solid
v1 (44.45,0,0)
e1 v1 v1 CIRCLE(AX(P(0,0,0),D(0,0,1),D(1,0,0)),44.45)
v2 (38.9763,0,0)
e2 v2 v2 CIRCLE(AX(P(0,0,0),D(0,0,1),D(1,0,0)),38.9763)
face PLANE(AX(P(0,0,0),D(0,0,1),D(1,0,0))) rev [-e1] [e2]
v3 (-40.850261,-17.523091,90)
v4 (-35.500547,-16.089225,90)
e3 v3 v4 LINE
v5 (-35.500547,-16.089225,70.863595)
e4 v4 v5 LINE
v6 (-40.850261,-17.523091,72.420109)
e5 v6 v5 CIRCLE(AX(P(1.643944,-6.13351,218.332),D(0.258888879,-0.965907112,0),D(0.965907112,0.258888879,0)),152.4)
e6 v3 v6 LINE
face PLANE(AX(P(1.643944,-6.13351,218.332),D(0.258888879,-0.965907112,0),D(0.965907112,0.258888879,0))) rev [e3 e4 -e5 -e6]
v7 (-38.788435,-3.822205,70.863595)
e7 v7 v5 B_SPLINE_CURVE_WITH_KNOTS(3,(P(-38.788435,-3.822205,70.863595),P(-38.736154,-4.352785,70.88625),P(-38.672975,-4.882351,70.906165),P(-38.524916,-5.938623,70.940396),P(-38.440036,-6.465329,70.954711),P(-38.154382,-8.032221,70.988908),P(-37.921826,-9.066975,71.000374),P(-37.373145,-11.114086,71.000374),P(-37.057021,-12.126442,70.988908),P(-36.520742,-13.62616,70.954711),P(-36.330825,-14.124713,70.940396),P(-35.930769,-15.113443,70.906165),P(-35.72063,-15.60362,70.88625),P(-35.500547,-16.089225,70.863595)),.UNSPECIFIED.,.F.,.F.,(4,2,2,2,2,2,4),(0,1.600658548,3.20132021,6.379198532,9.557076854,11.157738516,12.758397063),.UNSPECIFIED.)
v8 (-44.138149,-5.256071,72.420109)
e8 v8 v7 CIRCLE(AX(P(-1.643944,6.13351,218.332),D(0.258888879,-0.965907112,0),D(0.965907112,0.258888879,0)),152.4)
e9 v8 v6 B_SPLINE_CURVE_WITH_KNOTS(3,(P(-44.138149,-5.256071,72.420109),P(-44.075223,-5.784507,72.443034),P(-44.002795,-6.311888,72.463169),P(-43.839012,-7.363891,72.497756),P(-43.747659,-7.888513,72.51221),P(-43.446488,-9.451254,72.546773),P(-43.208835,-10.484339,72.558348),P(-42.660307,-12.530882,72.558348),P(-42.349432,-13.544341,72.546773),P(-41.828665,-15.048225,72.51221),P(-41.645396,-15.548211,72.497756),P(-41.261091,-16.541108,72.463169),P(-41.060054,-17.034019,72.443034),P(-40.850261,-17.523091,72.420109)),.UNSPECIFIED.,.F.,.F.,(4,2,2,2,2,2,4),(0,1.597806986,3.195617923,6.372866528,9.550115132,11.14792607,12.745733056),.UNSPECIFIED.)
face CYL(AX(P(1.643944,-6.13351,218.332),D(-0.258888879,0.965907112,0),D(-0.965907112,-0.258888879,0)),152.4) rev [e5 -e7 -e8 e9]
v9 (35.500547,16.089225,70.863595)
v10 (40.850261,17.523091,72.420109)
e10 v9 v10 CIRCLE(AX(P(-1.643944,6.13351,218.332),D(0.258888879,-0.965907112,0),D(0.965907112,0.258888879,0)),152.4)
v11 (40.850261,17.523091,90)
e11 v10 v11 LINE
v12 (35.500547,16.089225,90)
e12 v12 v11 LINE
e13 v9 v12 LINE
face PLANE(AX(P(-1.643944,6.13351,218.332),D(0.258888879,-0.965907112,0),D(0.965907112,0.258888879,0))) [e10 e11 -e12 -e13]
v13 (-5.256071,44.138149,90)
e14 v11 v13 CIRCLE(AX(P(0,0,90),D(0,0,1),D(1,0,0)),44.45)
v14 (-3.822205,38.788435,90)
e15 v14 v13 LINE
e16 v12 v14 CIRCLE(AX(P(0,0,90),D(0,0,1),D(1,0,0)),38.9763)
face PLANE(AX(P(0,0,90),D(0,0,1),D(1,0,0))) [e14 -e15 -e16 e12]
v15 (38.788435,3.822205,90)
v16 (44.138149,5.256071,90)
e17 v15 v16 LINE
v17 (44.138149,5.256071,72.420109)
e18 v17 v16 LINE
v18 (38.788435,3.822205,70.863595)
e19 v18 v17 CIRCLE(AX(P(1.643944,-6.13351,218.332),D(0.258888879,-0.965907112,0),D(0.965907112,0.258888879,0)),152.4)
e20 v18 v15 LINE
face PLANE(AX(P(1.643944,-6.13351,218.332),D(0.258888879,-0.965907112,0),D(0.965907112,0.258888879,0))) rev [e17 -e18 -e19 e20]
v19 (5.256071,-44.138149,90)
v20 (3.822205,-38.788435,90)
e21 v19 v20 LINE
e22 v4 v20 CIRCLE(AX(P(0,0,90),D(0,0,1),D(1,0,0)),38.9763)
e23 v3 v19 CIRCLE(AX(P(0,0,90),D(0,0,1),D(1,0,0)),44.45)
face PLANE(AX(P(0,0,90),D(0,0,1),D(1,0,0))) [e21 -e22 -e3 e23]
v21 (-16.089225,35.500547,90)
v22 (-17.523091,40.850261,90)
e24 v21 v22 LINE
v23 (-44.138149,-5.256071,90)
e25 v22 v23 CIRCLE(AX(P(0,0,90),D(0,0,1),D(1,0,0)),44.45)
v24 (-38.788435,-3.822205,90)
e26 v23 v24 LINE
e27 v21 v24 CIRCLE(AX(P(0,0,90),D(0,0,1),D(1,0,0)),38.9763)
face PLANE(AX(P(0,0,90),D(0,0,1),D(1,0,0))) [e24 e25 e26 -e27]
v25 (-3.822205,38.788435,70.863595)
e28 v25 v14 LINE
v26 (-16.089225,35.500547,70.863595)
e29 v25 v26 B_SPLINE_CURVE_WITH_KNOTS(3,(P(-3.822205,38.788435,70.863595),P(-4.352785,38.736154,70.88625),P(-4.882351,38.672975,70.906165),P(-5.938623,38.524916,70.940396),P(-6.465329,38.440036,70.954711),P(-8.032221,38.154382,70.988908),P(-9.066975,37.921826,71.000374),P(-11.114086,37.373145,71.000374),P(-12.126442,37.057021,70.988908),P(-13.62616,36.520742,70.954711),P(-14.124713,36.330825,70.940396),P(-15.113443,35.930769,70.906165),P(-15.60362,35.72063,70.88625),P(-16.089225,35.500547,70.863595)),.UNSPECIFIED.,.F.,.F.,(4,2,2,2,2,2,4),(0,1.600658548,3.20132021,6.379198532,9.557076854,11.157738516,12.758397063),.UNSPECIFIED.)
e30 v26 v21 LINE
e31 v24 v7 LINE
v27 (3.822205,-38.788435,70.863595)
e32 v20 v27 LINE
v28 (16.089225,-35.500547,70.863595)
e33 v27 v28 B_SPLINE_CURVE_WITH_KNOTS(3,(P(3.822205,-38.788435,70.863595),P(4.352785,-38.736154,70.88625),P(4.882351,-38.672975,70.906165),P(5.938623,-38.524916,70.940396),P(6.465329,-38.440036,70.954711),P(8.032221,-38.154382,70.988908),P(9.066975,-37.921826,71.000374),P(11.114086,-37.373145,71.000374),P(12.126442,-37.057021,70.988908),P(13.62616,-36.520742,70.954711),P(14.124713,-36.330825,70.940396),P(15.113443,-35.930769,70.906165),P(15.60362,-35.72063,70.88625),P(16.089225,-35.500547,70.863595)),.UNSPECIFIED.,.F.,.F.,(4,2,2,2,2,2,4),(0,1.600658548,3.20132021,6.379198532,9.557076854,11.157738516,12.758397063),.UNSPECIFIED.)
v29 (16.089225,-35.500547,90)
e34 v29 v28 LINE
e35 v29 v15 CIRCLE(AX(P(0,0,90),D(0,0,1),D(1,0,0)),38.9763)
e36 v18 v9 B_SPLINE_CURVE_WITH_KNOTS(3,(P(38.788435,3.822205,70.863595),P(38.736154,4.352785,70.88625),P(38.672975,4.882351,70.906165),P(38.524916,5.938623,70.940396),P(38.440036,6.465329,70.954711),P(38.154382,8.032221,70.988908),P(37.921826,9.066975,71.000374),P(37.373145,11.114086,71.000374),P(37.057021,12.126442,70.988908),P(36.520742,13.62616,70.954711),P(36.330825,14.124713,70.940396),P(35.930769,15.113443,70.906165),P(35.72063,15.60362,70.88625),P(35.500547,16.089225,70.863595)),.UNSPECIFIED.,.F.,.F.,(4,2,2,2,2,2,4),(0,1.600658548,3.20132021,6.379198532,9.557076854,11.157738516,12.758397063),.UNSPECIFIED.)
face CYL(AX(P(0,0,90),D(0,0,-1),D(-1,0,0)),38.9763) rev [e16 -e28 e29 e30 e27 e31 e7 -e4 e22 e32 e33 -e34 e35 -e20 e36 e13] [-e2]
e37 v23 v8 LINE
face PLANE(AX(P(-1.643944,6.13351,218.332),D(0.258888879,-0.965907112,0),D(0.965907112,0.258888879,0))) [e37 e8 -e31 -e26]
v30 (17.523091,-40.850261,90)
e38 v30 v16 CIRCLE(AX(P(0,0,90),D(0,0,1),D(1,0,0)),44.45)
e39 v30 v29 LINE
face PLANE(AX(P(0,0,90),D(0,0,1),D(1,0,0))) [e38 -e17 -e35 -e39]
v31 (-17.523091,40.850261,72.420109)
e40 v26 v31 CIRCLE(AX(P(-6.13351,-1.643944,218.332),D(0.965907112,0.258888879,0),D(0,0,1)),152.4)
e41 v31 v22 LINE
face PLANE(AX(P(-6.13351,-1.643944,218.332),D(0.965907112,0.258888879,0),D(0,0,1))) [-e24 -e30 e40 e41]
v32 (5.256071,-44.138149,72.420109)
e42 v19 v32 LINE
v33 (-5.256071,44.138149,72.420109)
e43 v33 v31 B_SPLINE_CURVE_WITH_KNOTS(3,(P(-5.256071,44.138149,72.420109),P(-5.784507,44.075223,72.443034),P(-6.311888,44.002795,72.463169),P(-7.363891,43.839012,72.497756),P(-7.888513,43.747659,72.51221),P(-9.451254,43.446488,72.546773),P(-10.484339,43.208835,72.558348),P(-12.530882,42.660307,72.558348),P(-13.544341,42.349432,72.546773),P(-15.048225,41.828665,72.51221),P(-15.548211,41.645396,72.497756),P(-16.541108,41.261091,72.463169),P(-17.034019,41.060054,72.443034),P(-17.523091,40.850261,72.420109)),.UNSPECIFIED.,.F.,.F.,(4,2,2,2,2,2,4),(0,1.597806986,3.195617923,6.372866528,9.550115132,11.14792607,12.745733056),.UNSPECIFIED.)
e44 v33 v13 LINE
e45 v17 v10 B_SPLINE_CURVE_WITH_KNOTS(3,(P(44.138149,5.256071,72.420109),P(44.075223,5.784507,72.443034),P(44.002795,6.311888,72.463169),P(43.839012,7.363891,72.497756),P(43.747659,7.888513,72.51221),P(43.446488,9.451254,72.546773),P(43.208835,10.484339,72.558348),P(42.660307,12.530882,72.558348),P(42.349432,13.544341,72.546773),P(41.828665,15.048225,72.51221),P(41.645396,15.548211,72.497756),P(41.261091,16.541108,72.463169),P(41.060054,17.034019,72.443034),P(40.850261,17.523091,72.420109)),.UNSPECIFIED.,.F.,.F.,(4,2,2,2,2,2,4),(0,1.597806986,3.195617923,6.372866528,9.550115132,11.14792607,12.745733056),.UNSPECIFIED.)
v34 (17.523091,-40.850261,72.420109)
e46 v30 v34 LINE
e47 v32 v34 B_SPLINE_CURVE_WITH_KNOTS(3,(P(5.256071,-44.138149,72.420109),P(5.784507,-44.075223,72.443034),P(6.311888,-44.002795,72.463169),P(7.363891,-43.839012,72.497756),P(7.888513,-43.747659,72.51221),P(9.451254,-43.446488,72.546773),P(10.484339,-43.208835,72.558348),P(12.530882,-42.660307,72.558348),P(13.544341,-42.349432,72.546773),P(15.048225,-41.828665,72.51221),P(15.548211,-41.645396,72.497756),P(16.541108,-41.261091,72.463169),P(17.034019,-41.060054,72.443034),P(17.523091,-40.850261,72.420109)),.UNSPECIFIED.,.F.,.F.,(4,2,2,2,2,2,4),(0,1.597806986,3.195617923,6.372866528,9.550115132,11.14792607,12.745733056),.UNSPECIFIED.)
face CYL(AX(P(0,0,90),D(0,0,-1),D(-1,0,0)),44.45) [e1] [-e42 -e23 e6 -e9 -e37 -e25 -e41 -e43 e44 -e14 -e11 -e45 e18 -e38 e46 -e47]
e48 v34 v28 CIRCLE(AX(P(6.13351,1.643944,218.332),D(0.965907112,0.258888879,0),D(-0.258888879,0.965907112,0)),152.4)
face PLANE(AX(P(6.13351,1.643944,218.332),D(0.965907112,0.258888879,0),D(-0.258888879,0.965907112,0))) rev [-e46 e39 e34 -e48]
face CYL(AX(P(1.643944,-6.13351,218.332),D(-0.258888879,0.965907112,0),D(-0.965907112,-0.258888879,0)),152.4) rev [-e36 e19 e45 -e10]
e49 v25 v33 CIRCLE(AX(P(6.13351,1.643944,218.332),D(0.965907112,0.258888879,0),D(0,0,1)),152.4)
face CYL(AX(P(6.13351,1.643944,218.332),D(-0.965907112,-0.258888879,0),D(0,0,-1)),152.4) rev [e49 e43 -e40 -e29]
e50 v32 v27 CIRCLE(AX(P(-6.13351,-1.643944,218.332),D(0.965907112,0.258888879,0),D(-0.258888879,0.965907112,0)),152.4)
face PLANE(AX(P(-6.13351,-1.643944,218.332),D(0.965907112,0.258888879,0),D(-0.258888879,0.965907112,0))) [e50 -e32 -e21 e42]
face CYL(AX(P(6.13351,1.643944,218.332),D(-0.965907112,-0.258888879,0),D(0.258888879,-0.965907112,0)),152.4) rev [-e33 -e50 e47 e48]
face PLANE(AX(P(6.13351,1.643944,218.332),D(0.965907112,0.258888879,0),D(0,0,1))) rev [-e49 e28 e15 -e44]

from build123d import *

# Parameters (mm, degrees)
SKETCH1_R           = 44.45
SKETCH1_R_2         = 38.9763
BOSS_EXTRUDE1_DEPTH = 90
CAVITY1_START       = -6.35
CAVITY1_DEPTH       = 12.7
CAVITY1_2_DEPTH     = 12.7


# Read off the part's stored shape, not the designer's step: Cavity1
with BuildPart() as part:
    # Sketch1 → Boss-Extrude1 (new body)
    with BuildSketch(Plane.XY):
        with Locations(Location((0, 0, 0), (0, 0, 180))):
            Circle(SKETCH1_R)
        with Locations(Location((0, 0, 0), (0, 0, 180))):
            Circle(SKETCH1_R_2, mode=Mode.SUBTRACT)
    extrude(amount=BOSS_EXTRUDE1_DEPTH)

    # Cavity1 outline → Cavity1 (cut)
    with BuildSketch(Plane(origin=(0, 0, 0), x_dir=(-0.258888878578149, 0.9659071117600018, 0), z_dir=(0.9659071117600018, 0.25888887857814896, 0)).offset(CAVITY1_START)):
        with BuildLine():
            ThreePointArc((38.455551767, 70.863594779), (41.461594511, 71.680385005), (44.450315107, 72.558444487))
            Line((44.450315107, 72.558444487), (46, 73.030985488))
            Line((46, 73.030985488), (46, 90))
            Line((46, 90), (-46, 90))
            Line((-46, 90), (-46, 73.030985488))
            Line((-46, 73.030985488), (-44.450315107, 72.558444487))
            ThreePointArc((-44.450315107, 72.558444487), (-41.461594511, 71.680385005), (-38.455551767, 70.863594779))
            Line((-38.455551767, 70.863594779), (-31.309084293, 69))
            Line((-31.309084293, 69), (31.309084293, 69))
            Line((31.309084293, 69), (38.455551767, 70.863594779))
        make_face()
    extrude(amount=CAVITY1_DEPTH, mode=Mode.SUBTRACT)

    # Cavity1 2 outline → Cavity1 2 (cut)
    with BuildSketch(Plane(origin=(0, 0, 0), x_dir=(0.9659071117600018, 0.258888878578149, 0), z_dir=(0.25888887857814896, -0.9659071117600018, 0)).offset(CAVITY1_START)):
        with BuildLine():
            ThreePointArc((38.455551767, 70.863594779), (41.461594511, 71.680385005), (44.450315107, 72.558444487))
            Line((44.450315107, 72.558444487), (46, 73.030985488))
            Line((46, 73.030985488), (46, 90))
            Line((46, 90), (-46, 90))
            Line((-46, 90), (-46, 73.030985488))
            Line((-46, 73.030985488), (-44.450315107, 72.558444487))
            ThreePointArc((-44.450315107, 72.558444487), (-41.461594511, 71.680385005), (-38.455551767, 70.863594779))
            Line((-38.455551767, 70.863594779), (-31.309084293, 69))
            Line((-31.309084293, 69), (31.309084293, 69))
            Line((31.309084293, 69), (38.455551767, 70.863594779))
        make_face()
    extrude(amount=CAVITY1_2_DEPTH, mode=Mode.SUBTRACT)


solid = part.part
